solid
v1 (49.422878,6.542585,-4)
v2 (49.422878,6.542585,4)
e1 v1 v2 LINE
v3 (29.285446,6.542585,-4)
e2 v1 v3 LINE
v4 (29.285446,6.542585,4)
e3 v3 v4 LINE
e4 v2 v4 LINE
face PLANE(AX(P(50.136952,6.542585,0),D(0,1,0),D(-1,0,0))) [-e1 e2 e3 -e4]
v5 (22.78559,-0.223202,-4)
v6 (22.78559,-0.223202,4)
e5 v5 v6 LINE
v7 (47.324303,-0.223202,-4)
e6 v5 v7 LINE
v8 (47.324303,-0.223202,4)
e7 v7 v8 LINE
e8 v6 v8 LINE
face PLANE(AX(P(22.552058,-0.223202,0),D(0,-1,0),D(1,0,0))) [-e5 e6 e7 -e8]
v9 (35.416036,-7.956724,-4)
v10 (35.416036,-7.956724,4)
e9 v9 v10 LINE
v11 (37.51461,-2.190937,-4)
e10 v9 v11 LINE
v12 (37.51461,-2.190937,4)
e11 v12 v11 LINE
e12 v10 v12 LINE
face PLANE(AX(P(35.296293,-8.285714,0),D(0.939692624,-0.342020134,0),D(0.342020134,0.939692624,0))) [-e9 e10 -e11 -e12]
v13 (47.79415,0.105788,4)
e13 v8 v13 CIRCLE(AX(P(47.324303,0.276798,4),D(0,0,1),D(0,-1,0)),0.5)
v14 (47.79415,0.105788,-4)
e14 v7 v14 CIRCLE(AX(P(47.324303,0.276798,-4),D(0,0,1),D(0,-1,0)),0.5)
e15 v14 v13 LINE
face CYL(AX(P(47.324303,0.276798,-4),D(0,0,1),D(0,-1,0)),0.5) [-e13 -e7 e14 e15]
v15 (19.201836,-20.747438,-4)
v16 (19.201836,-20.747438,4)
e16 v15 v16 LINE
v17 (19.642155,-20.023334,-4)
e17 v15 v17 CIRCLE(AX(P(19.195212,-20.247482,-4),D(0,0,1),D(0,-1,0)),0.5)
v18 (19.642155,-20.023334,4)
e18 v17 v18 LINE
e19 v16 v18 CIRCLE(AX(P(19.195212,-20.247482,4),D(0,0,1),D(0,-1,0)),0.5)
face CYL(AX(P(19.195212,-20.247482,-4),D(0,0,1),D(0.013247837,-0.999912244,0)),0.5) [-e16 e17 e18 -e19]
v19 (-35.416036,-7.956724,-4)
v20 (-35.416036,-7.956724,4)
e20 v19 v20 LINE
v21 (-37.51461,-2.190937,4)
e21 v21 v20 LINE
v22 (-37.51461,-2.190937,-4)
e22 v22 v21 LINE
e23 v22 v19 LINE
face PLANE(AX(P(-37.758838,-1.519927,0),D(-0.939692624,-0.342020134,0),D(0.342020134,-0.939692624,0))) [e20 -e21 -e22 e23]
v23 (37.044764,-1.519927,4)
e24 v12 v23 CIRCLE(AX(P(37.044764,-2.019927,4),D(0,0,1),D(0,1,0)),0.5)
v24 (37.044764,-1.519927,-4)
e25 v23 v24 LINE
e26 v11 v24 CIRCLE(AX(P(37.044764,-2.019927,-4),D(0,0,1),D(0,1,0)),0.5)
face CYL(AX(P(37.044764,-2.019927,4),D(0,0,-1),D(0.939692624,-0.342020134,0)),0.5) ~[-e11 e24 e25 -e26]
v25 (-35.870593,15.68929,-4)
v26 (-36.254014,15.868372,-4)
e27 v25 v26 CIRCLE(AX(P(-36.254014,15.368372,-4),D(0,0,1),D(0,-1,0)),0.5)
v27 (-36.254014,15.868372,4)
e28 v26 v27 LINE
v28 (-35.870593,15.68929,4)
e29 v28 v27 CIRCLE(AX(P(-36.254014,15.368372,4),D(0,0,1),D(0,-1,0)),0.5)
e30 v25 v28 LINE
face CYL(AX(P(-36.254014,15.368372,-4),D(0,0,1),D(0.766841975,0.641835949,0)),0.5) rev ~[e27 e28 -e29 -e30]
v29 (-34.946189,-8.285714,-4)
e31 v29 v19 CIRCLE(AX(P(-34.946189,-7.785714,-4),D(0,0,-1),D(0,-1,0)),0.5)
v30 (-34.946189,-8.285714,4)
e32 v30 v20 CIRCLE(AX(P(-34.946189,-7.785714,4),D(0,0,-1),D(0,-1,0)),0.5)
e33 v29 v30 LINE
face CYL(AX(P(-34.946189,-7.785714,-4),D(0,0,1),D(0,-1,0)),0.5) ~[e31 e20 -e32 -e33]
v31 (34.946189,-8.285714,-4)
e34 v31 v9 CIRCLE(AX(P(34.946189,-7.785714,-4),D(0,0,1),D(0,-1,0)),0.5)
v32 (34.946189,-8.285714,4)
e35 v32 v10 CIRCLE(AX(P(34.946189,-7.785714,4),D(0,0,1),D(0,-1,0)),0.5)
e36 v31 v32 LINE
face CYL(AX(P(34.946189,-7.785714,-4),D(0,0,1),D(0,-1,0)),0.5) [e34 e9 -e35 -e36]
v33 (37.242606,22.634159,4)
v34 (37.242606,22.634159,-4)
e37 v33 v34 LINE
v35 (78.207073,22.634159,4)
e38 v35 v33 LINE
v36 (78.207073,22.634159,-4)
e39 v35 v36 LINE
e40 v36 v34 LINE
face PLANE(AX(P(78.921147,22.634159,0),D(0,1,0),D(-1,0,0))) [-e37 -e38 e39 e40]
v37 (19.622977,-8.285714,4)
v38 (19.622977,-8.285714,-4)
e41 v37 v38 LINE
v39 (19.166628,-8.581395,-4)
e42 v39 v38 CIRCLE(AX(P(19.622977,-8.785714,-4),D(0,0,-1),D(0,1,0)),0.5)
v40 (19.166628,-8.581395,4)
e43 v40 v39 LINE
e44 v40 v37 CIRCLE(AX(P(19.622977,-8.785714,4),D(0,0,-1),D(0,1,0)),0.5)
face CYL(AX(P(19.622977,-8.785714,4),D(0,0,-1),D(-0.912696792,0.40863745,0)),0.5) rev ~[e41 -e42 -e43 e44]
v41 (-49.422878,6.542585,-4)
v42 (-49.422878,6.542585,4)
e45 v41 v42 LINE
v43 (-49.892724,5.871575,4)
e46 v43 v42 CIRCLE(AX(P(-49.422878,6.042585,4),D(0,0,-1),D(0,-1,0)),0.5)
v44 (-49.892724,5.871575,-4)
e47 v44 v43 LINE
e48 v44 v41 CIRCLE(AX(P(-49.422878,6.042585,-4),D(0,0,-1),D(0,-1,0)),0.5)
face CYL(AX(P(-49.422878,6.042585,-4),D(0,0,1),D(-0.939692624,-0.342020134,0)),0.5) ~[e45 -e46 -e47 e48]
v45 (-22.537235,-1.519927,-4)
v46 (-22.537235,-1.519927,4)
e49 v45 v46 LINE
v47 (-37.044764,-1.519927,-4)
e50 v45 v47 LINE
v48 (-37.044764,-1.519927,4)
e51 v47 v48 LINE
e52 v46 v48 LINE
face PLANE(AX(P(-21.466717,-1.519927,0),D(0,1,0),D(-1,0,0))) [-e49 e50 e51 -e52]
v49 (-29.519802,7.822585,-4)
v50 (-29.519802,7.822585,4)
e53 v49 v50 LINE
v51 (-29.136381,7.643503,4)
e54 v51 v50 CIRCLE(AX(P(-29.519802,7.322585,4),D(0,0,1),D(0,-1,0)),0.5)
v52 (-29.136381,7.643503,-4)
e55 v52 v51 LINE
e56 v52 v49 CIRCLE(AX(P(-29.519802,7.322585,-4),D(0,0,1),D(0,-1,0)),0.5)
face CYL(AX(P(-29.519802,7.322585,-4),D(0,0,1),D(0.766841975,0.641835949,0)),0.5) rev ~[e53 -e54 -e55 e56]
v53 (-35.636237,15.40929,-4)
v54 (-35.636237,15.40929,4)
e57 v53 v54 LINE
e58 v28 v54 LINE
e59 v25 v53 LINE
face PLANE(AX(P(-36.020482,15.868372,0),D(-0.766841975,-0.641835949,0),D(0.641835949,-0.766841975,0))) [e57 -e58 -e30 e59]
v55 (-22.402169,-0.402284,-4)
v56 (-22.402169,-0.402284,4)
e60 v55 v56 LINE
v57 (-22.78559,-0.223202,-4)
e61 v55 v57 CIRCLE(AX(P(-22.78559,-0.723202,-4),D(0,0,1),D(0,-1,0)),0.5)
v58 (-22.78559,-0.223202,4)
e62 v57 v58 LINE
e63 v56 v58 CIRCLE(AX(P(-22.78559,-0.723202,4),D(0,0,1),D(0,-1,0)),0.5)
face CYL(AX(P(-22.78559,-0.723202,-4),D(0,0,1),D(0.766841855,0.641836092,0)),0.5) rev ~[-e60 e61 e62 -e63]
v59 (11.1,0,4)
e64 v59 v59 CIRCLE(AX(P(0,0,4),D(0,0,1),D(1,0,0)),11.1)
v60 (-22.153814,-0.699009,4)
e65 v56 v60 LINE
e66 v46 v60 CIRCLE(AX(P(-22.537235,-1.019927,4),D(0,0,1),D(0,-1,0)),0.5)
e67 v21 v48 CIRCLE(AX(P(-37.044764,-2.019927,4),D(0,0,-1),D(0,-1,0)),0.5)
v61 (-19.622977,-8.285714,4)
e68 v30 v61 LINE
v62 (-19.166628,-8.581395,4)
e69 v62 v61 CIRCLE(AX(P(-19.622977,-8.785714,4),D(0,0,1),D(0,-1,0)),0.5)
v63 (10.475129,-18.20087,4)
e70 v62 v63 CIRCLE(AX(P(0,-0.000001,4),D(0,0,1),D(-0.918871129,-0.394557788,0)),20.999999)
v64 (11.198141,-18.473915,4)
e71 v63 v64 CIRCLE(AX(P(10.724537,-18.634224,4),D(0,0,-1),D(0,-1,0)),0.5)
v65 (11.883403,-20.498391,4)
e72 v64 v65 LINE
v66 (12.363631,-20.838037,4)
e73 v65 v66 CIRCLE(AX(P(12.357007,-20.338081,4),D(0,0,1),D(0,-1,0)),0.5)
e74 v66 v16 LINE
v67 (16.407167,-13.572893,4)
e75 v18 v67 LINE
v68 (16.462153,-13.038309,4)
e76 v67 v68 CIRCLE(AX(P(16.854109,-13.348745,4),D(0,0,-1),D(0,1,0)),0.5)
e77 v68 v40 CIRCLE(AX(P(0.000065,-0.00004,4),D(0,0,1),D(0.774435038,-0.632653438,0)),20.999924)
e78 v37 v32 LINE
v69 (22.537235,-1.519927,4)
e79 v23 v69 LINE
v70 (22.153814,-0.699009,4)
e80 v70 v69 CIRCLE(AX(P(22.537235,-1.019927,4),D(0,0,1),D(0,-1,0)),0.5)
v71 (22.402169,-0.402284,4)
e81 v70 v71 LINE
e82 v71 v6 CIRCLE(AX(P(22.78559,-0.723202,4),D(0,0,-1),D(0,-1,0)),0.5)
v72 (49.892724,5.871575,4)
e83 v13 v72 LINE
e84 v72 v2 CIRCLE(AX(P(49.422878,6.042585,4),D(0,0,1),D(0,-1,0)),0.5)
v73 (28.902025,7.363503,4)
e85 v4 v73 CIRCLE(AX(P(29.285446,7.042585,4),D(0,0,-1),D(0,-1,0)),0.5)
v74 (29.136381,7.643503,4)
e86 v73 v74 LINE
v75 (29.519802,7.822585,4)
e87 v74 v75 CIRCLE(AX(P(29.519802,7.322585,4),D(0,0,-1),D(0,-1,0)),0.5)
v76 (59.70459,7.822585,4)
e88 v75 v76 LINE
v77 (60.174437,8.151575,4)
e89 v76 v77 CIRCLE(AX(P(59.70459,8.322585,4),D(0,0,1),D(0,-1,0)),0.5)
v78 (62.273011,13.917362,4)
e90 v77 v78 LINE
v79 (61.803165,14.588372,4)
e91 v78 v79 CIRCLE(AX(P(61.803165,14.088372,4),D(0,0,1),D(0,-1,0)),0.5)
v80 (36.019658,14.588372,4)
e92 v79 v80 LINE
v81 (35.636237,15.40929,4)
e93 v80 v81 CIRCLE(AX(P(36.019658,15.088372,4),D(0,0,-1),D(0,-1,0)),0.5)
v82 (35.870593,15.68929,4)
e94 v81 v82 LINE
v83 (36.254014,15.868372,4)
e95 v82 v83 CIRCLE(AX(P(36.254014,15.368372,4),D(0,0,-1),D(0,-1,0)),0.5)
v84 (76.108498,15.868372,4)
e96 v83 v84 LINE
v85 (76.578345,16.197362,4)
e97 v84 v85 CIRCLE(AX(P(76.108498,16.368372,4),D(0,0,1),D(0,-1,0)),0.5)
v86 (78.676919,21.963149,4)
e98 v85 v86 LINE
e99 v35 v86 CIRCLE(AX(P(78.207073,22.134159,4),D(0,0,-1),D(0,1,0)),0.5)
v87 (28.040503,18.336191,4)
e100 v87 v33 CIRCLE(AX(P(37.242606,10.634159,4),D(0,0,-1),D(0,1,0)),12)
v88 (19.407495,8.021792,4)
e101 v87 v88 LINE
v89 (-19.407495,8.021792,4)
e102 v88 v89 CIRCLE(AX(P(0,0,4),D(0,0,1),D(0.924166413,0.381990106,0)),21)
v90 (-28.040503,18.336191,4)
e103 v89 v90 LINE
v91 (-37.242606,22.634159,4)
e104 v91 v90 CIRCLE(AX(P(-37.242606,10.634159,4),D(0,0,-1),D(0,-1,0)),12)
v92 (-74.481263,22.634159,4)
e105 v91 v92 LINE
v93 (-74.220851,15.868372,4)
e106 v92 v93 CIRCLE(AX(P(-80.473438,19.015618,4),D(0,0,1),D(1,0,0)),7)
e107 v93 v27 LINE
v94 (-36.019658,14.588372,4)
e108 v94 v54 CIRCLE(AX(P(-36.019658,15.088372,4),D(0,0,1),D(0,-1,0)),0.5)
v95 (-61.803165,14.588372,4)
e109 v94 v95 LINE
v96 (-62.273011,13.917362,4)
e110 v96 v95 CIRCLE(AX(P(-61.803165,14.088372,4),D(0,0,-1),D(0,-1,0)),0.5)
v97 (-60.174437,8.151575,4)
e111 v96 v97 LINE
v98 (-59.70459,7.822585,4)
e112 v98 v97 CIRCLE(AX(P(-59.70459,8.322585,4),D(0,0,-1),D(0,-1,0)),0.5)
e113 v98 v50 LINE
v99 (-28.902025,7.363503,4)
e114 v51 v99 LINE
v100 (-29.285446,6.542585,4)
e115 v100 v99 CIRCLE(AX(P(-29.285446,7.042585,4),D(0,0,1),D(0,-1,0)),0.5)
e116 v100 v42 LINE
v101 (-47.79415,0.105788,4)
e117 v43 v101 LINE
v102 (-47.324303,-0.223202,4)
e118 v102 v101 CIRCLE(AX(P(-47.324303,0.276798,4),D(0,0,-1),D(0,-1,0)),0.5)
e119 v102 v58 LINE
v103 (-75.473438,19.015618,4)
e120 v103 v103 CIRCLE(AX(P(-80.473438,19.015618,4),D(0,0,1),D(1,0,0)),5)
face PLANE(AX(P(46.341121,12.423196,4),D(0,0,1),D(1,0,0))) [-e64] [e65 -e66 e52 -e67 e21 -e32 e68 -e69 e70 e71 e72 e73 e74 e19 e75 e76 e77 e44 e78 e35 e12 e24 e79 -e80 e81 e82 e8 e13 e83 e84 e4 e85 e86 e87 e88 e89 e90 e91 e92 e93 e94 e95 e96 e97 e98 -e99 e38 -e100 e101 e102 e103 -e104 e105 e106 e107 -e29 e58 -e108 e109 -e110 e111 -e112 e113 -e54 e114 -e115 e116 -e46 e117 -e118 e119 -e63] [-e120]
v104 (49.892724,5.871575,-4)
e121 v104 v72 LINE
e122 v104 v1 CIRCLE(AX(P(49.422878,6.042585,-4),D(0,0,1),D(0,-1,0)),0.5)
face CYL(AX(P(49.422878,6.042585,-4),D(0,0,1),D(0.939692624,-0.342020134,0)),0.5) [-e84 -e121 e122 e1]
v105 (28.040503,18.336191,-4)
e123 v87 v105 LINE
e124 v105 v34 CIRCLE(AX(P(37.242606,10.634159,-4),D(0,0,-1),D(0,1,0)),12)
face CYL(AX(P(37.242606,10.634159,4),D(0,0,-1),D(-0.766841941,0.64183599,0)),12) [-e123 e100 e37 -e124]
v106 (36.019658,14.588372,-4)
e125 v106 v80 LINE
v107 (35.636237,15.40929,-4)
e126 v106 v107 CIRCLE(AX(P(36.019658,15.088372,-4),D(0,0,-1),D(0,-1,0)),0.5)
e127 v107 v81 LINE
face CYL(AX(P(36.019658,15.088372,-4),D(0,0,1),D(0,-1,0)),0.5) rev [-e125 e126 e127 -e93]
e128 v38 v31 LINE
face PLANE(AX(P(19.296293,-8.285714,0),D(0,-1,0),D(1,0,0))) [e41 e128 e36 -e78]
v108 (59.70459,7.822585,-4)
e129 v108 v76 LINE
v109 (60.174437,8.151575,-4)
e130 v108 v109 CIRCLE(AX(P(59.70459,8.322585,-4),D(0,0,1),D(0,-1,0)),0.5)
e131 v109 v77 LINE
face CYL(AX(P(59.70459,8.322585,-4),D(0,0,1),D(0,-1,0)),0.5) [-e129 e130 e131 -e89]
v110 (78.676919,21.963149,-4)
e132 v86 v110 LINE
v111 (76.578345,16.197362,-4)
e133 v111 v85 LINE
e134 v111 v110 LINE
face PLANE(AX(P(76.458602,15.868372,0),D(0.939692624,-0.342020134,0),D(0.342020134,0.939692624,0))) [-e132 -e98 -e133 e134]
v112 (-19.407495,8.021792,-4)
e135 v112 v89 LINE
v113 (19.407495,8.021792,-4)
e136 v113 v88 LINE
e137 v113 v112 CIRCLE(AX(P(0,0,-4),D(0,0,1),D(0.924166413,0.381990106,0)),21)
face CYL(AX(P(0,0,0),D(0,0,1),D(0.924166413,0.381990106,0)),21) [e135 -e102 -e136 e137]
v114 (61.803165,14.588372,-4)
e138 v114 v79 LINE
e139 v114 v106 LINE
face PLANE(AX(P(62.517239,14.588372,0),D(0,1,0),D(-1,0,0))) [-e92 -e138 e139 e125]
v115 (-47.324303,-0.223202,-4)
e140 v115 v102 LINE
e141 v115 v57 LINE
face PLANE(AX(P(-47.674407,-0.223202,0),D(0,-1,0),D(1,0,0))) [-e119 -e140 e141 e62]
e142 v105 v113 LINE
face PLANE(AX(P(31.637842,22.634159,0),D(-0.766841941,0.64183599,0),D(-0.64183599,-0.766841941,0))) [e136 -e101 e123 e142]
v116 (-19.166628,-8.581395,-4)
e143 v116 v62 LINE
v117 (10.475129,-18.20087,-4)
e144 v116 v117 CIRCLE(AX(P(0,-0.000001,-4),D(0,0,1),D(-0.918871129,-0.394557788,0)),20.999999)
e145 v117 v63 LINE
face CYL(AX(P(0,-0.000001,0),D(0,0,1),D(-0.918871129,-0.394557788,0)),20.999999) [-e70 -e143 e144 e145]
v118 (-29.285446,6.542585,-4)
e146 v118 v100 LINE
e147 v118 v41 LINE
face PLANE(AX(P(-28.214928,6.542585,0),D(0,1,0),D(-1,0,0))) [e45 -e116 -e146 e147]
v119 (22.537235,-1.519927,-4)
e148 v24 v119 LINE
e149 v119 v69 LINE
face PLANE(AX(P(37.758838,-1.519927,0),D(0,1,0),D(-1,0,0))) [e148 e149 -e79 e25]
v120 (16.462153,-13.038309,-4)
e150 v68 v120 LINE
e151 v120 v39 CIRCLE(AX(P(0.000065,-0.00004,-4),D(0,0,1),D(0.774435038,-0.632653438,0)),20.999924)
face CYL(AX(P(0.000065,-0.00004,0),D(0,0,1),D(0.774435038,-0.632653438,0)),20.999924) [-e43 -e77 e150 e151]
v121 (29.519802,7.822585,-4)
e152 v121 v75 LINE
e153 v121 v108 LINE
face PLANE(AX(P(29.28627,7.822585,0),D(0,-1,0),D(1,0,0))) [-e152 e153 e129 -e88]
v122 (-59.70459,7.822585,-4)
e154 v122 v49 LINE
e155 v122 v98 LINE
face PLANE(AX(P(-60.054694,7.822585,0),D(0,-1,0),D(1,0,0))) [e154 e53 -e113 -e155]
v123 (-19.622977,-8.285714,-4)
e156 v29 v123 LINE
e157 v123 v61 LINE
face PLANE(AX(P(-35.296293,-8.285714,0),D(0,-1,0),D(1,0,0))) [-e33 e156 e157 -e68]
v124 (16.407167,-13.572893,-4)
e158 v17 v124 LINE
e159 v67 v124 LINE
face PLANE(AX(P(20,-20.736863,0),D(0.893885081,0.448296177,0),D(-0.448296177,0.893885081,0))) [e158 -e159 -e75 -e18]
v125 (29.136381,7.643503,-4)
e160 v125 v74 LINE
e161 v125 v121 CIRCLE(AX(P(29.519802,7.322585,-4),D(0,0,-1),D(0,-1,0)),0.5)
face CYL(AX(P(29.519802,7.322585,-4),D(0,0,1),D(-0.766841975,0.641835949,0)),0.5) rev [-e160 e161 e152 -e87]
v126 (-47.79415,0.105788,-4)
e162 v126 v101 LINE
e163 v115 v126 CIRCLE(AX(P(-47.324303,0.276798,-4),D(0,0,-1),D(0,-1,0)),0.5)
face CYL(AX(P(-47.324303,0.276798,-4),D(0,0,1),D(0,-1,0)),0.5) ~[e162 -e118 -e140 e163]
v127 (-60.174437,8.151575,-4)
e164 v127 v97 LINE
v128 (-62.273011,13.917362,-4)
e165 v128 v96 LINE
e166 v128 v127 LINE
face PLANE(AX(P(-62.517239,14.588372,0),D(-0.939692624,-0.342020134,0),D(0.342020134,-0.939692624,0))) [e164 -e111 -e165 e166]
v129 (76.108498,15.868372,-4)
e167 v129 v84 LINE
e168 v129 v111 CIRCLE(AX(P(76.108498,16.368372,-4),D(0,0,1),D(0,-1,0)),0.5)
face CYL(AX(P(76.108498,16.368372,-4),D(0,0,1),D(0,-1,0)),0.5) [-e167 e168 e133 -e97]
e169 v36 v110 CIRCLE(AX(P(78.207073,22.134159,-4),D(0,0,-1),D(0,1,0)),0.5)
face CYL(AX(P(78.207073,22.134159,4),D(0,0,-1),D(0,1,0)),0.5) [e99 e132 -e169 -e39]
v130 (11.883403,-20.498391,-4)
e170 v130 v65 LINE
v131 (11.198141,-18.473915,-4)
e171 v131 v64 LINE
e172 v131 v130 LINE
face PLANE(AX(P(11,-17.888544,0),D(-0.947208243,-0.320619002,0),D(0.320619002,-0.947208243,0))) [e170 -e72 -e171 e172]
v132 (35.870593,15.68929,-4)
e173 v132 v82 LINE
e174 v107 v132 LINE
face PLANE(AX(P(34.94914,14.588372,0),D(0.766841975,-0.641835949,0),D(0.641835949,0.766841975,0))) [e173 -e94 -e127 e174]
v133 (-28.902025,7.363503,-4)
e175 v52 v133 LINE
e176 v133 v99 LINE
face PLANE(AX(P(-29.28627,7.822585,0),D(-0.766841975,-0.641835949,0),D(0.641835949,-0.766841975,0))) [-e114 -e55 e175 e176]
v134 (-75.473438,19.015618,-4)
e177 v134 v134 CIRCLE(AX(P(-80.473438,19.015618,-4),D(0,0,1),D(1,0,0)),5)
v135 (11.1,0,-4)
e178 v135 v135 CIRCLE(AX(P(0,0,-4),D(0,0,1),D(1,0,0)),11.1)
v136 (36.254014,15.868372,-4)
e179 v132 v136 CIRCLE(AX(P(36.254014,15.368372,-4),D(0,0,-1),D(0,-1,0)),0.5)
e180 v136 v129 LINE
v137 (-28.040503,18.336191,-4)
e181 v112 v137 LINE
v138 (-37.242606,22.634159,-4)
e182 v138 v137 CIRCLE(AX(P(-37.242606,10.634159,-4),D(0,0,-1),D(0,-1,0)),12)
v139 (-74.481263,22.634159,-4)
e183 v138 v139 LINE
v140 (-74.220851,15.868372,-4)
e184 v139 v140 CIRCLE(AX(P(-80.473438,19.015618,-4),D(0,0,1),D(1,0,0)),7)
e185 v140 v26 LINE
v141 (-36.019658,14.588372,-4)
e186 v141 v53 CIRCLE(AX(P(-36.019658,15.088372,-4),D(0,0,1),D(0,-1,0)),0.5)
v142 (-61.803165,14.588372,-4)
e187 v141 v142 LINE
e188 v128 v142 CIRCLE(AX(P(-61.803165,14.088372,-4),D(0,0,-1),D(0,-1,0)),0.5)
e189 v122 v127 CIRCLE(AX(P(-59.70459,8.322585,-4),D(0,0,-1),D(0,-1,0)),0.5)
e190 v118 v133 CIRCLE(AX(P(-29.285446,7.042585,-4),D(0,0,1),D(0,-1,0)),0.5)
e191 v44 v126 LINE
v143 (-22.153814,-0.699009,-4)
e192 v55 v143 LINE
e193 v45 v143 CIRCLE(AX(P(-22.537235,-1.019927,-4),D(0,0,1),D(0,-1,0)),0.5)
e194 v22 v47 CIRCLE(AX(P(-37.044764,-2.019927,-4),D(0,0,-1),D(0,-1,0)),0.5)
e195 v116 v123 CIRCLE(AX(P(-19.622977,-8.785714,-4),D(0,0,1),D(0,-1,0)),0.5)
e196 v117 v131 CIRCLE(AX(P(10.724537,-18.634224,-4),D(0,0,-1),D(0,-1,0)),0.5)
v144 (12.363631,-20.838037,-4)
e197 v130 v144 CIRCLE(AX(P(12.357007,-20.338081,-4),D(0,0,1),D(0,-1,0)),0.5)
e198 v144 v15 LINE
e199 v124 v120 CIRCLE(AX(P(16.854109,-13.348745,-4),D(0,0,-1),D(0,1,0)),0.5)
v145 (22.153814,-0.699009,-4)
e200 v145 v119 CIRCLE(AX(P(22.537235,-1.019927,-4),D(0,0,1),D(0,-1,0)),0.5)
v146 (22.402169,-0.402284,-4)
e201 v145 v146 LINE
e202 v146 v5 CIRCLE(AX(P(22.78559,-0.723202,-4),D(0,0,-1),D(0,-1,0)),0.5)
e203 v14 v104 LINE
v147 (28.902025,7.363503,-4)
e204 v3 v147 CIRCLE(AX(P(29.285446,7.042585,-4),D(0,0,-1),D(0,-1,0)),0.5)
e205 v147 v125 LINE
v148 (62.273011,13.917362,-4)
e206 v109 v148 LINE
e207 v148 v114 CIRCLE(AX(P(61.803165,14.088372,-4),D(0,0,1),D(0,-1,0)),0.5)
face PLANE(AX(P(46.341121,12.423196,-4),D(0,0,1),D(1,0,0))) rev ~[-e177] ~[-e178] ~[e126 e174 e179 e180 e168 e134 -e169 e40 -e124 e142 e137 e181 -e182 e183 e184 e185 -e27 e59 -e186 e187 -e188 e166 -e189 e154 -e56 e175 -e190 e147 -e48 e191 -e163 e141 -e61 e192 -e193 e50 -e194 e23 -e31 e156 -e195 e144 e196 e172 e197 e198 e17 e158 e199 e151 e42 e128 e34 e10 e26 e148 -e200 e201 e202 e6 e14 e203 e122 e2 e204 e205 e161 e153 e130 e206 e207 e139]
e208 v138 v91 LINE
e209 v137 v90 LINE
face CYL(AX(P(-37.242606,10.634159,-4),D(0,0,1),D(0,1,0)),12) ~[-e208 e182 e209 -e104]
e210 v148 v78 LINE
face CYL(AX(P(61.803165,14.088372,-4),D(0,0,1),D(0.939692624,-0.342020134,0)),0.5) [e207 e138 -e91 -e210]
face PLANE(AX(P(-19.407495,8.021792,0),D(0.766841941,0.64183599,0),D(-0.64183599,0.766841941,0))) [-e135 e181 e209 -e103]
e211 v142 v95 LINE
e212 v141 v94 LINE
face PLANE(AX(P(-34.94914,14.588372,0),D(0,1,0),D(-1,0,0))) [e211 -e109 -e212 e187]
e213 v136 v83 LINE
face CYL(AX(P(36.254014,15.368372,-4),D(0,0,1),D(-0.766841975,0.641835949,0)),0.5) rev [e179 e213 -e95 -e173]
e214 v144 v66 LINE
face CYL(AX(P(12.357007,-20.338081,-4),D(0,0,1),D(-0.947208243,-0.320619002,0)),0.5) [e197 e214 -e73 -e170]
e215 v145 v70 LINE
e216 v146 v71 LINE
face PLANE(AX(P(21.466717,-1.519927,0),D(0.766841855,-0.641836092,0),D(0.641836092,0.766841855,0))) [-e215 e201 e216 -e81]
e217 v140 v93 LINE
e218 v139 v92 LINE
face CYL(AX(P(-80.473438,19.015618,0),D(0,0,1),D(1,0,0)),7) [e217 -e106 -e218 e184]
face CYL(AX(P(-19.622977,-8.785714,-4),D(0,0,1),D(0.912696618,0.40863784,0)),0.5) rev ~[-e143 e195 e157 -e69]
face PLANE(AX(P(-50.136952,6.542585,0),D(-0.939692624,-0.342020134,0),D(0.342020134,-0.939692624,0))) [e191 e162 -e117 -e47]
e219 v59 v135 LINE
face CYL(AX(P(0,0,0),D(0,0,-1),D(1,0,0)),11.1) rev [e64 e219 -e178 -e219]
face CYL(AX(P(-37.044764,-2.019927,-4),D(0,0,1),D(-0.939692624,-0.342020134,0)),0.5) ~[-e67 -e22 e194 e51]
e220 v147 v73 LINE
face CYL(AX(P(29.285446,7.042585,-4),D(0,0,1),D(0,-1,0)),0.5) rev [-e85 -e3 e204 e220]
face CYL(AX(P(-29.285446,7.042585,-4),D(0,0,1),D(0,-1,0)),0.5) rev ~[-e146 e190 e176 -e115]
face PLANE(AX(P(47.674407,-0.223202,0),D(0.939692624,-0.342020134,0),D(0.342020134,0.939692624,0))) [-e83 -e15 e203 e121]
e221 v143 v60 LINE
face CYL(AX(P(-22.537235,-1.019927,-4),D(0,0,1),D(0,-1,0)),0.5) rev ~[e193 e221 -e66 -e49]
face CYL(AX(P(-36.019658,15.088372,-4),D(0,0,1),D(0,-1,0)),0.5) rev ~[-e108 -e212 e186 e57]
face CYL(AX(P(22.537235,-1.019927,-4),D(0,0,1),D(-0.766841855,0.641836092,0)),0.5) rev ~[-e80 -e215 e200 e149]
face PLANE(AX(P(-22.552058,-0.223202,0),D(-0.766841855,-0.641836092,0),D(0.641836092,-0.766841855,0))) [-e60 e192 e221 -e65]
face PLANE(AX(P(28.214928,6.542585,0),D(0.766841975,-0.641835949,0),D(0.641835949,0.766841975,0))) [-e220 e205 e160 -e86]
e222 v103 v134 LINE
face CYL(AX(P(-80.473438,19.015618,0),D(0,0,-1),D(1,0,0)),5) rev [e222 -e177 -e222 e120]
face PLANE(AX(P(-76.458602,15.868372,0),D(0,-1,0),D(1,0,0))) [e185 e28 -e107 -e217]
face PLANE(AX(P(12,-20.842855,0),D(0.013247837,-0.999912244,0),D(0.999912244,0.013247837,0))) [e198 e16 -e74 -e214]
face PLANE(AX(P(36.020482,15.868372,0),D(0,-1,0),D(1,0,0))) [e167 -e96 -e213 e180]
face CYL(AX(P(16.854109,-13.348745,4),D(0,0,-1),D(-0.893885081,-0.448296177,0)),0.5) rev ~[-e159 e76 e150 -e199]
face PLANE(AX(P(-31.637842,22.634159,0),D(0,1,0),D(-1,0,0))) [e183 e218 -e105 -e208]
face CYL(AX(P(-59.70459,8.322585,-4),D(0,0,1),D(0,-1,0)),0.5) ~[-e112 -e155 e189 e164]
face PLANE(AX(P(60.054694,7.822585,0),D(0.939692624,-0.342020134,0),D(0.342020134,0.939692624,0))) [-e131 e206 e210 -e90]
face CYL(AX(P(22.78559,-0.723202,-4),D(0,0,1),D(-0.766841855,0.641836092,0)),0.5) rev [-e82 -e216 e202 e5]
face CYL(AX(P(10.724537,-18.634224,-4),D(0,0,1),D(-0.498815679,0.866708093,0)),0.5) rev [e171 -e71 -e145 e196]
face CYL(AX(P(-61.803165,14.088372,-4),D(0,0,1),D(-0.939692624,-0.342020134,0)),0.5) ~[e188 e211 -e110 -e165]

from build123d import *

# Parameters (mm, degrees)
F0_R     = 11.1
F1_DEPTH = 4
F2_DEPTH = 4
F3_DEPTH = 4
F4_DEPTH = 4
F5_R     = 0.5
F6_R     = 7
F6_R_2   = 5
F7_DEPTH = 4
F8_R     = 5
F9_DEPTH = 25
F10_R    = 12


# Not quite as in the source:
# - a feature names something its author has since deleted; it is built from what else it names


with BuildPart() as f1:
    # F0 (on Top) → F1 (new body, symmetric)
    with BuildSketch(Plane.XY):
        with BuildLine():
            ThreePointArc((20.944924, -1.519927), (20.986226, -0.760462), (21, 0))
            ThreePointArc((21, 0), (20.598026, 4.089169), (19.407495, 8.021792))
            ThreePointArc((19.407495, 8.021792), (0, 21), (-19.407495, 8.021792))
            ThreePointArc((-19.407495, 8.021792), (-20.732595, 3.340581), (-20.944924, -1.519927))
            ThreePointArc((-20.944924, -1.519927), (-20.403011, -4.971634), (-19.296293, -8.285714))
            ThreePointArc((-19.296293, -8.285714), (-6.345132, -20.018474), (11, -17.888544))
            ThreePointArc((11, -17.888544), (13.82448, -15.807712), (16.263142, -13.285714))
            ThreePointArc((16.263142, -13.285714), (17.95462, -10.891815), (19.296293, -8.285714))
            ThreePointArc((19.296293, -8.285714), (20.403011, -4.971634), (20.944924, -1.519927))
        make_face()
        Circle(F0_R, mode=Mode.SUBTRACT)
        with BuildLine():
            Line((20, -20.736863), (16.263142, -13.285714))
            ThreePointArc((16.263142, -13.285714), (13.82448, -15.807712), (11, -17.888544))
            Line((11, -17.888544), (12, -20.842855))
            Line((12, -20.842855), (20, -20.736863))
        make_face()
    extrude(amount=F1_DEPTH, both=True)

    # F0 (on Top) → F2 (join, symmetric)
    with BuildSketch(Plane.XY):
        with BuildLine():
            Line((21.466717, -1.519927), (20.944924, -1.519927))
            ThreePointArc((20.944924, -1.519927), (20.403011, -4.971634), (19.296293, -8.285714))
            Line((19.296293, -8.285714), (35.296293, -8.285714))
            Line((35.296293, -8.285714), (37.758838, -1.519927))
            Line((37.758838, -1.519927), (21.466717, -1.519927))
        make_face()
    extrude(amount=F2_DEPTH, both=True)

    # F0 (on Top) → F3 (join, symmetric)
    with BuildSketch(Plane.XY):
        with BuildLine():
            ThreePointArc((19.407495, 8.021792), (20.598026, 4.089169), (21, 0))
            ThreePointArc((21, 0), (20.986226, -0.760462), (20.944924, -1.519927))
            Line((20.944924, -1.519927), (21.466717, -1.519927))
            Line((21.466717, -1.519927), (22.552058, -0.223202))
            Line((22.552058, -0.223202), (22.998917, -0.223202))
            Line((22.998917, -0.223202), (47.674407, -0.223202))
            Line((47.674407, -0.223202), (50.136952, 6.542585))
            Line((50.136952, 6.542585), (29.636583, 6.542585))
            Line((29.636583, 6.542585), (28.214928, 6.542585))
            Line((28.214928, 6.542585), (29.28627, 7.822585))
            Line((29.28627, 7.822585), (47.431346, 7.822585))
            Line((47.431346, 7.822585), (60.054694, 7.822585))
            Line((60.054694, 7.822585), (62.517239, 14.588372))
            Line((62.517239, 14.588372), (43.96666, 14.588372))
            Line((43.96666, 14.588372), (34.94914, 14.588372))
            Line((34.94914, 14.588372), (36.020482, 15.868372))
            Line((36.020482, 15.868372), (54.509119, 15.868372))
            Line((54.509119, 15.868372), (62.740314, 15.868372))
            Line((62.740314, 15.868372), (76.458602, 15.868372))
            Line((76.458602, 15.868372), (78.921147, 22.634159))
            Line((78.921147, 22.634159), (31.637842, 22.634159))
            Line((31.637842, 22.634159), (19.407495, 8.021792))
        make_face()
    extrude(amount=F3_DEPTH, both=True)

    # F0 (on Top) → F4 (join, symmetric)
    with BuildSketch(Plane.XY):
        with BuildLine():
            ThreePointArc((20.944924, -1.519927), (20.986226, -0.760462), (21, 0))
            ThreePointArc((21, 0), (20.598026, 4.089169), (19.407495, 8.021792))
            ThreePointArc((19.407495, 8.021792), (0, 21), (-19.407495, 8.021792))
            ThreePointArc((-19.407495, 8.021792), (-20.732595, 3.340581), (-20.944924, -1.519927))
            ThreePointArc((-20.944924, -1.519927), (-20.403011, -4.971634), (-19.296293, -8.285714))
            ThreePointArc((-19.296293, -8.285714), (-6.345132, -20.018474), (11, -17.888544))
            ThreePointArc((11, -17.888544), (13.82448, -15.807712), (16.263142, -13.285714))
            ThreePointArc((16.263142, -13.285714), (17.95462, -10.891815), (19.296293, -8.285714))
            ThreePointArc((19.296293, -8.285714), (20.403011, -4.971634), (20.944924, -1.519927))
        make_face()
        Circle(F0_R, mode=Mode.SUBTRACT)
        with BuildLine():
            ThreePointArc((19.407495, 8.021792), (20.598026, 4.089169), (21, 0))
            ThreePointArc((21, 0), (20.986226, -0.760462), (20.944924, -1.519927))
            Line((20.944924, -1.519927), (21.466717, -1.519927))
            Line((21.466717, -1.519927), (22.552058, -0.223202))
            Line((22.552058, -0.223202), (22.998917, -0.223202))
            Line((22.998917, -0.223202), (47.674407, -0.223202))
            Line((47.674407, -0.223202), (50.136952, 6.542585))
            Line((50.136952, 6.542585), (29.636583, 6.542585))
            Line((29.636583, 6.542585), (28.214928, 6.542585))
            Line((28.214928, 6.542585), (29.28627, 7.822585))
            Line((29.28627, 7.822585), (47.431346, 7.822585))
            Line((47.431346, 7.822585), (60.054694, 7.822585))
            Line((60.054694, 7.822585), (62.517239, 14.588372))
            Line((62.517239, 14.588372), (43.96666, 14.588372))
            Line((43.96666, 14.588372), (34.94914, 14.588372))
            Line((34.94914, 14.588372), (36.020482, 15.868372))
            Line((36.020482, 15.868372), (54.509119, 15.868372))
            Line((54.509119, 15.868372), (62.740314, 15.868372))
            Line((62.740314, 15.868372), (76.458602, 15.868372))
            Line((76.458602, 15.868372), (78.921147, 22.634159))
            Line((78.921147, 22.634159), (31.637842, 22.634159))
            Line((31.637842, 22.634159), (19.407495, 8.021792))
        make_face()
        with BuildLine():
            Line((21.466717, -1.519927), (20.944924, -1.519927))
            ThreePointArc((20.944924, -1.519927), (20.403011, -4.971634), (19.296293, -8.285714))
            Line((19.296293, -8.285714), (35.296293, -8.285714))
            Line((35.296293, -8.285714), (37.758838, -1.519927))
            Line((37.758838, -1.519927), (21.466717, -1.519927))
        make_face()
        with BuildLine():
            ThreePointArc((-20.944924, -1.519927), (-20.732595, 3.340581), (-19.407495, 8.021792))
            Line((-19.407495, 8.021792), (-31.637842, 22.634159))
            Line((-31.637842, 22.634159), (-78.921147, 22.634159))
            Line((-78.921147, 22.634159), (-76.458602, 15.868372))
            Line((-76.458602, 15.868372), (-62.740314, 15.868372))
            Line((-62.740314, 15.868372), (-54.509119, 15.868372))
            Line((-54.509119, 15.868372), (-36.020482, 15.868372))
            Line((-36.020482, 15.868372), (-34.94914, 14.588372))
            Line((-34.94914, 14.588372), (-43.96666, 14.588372))
            Line((-43.96666, 14.588372), (-62.517239, 14.588372))
            Line((-62.517239, 14.588372), (-60.054694, 7.822585))
            Line((-60.054694, 7.822585), (-47.431346, 7.822585))
            Line((-47.431346, 7.822585), (-29.28627, 7.822585))
            Line((-29.28627, 7.822585), (-28.214928, 6.542585))
            Line((-28.214928, 6.542585), (-29.636583, 6.542585))
            Line((-29.636583, 6.542585), (-50.136952, 6.542585))
            Line((-50.136952, 6.542585), (-47.674407, -0.223202))
            Line((-47.674407, -0.223202), (-22.552058, -0.223202))
            Line((-22.552058, -0.223202), (-21.466717, -1.519927))
            Line((-21.466717, -1.519927), (-20.944924, -1.519927))
        make_face()
        with BuildLine():
            ThreePointArc((-19.296293, -8.285714), (-20.403011, -4.971634), (-20.944924, -1.519927))
            Line((-20.944924, -1.519927), (-21.466717, -1.519927))
            Line((-21.466717, -1.519927), (-37.758838, -1.519927))
            Line((-37.758838, -1.519927), (-35.296293, -8.285714))
            Line((-35.296293, -8.285714), (-19.296293, -8.285714))
        make_face()
        with BuildLine():
            Line((20, -20.736863), (16.263142, -13.285714))
            ThreePointArc((16.263142, -13.285714), (13.82448, -15.807712), (11, -17.888544))
            Line((11, -17.888544), (12, -20.842855))
            Line((12, -20.842855), (20, -20.736863))
        make_face()
    extrude(amount=F4_DEPTH, both=True)

    # F5
    f5_edges = [f1.edges().sort_by_distance(p)[0] for p in [
        (-36.020482, 15.868372, 0),
        (-29.28627, 7.822585, 0),
        (-22.552058, -0.223202, 0),
        (-19.296293, -8.285714, 0),
        (-21.466717, -1.519927, 0),
        (-28.214928, 6.542585, 0),
        (-34.94914, 14.588372, 0),
        (-78.921147, 22.634159, 0),
        (-76.458602, 15.868372, 0),
        (-62.517239, 14.588372, 0),
        (-60.054694, 7.822585, 0),
        (-50.136952, 6.542585, 0),
        (-37.758838, -1.519927, 0),
        (-35.296293, -8.285714, 0),
        (-47.674407, -0.223202, 0),
        (78.921147, 22.634159, 0),
        (76.458602, 15.868372, 0),
        (62.517239, 14.588372, 0),
        (60.054694, 7.822585, 0),
        (50.136952, 6.542585, 0),
        (37.758838, -1.519927, 0),
        (35.296293, -8.285714, 0),
        (47.674407, -0.223202, 0),
        (21.466717, -1.519927, 0),
        (28.214928, 6.542585, 0),
        (34.94914, 14.588372, 0),
        (36.020482, 15.868372, 0),
        (29.28627, 7.822585, 0),
        (22.552058, -0.223202, 0),
        (19.296293, -8.285714, 0),
        (20, -20.736863, 0),
        (12, -20.842855, 0),
        (11, -17.888544, 0),
        (16.263142, -13.285714, 0),
    ]]
    fillet(f5_edges, radius=F5_R)

    # F6 (on Top) → F7 (join, symmetric)
    with BuildSketch(Plane.XY):
        with Locations((-80.473438, 19.015618)):
            Circle(F6_R)
        with Locations((-80.473438, 19.015618)):
            Circle(F6_R_2, mode=Mode.SUBTRACT)
    extrude(amount=F7_DEPTH, both=True)

    # F8 (on face) → F9 (cut)
    with BuildSketch(Plane.XY.offset(4)):
        with Locations((-80.473438, 19.015618)):
            Circle(F8_R)
    extrude(amount=-F9_DEPTH, mode=Mode.SUBTRACT)

    # F10
    f10_edges = [f1.edges().sort_by_distance(p)[0] for p in [
        (-31.637842, 22.634159, 0),
        (31.637842, 22.634159, 0),
    ]]
    fillet(f10_edges, radius=F10_R)


solid = f1.part
